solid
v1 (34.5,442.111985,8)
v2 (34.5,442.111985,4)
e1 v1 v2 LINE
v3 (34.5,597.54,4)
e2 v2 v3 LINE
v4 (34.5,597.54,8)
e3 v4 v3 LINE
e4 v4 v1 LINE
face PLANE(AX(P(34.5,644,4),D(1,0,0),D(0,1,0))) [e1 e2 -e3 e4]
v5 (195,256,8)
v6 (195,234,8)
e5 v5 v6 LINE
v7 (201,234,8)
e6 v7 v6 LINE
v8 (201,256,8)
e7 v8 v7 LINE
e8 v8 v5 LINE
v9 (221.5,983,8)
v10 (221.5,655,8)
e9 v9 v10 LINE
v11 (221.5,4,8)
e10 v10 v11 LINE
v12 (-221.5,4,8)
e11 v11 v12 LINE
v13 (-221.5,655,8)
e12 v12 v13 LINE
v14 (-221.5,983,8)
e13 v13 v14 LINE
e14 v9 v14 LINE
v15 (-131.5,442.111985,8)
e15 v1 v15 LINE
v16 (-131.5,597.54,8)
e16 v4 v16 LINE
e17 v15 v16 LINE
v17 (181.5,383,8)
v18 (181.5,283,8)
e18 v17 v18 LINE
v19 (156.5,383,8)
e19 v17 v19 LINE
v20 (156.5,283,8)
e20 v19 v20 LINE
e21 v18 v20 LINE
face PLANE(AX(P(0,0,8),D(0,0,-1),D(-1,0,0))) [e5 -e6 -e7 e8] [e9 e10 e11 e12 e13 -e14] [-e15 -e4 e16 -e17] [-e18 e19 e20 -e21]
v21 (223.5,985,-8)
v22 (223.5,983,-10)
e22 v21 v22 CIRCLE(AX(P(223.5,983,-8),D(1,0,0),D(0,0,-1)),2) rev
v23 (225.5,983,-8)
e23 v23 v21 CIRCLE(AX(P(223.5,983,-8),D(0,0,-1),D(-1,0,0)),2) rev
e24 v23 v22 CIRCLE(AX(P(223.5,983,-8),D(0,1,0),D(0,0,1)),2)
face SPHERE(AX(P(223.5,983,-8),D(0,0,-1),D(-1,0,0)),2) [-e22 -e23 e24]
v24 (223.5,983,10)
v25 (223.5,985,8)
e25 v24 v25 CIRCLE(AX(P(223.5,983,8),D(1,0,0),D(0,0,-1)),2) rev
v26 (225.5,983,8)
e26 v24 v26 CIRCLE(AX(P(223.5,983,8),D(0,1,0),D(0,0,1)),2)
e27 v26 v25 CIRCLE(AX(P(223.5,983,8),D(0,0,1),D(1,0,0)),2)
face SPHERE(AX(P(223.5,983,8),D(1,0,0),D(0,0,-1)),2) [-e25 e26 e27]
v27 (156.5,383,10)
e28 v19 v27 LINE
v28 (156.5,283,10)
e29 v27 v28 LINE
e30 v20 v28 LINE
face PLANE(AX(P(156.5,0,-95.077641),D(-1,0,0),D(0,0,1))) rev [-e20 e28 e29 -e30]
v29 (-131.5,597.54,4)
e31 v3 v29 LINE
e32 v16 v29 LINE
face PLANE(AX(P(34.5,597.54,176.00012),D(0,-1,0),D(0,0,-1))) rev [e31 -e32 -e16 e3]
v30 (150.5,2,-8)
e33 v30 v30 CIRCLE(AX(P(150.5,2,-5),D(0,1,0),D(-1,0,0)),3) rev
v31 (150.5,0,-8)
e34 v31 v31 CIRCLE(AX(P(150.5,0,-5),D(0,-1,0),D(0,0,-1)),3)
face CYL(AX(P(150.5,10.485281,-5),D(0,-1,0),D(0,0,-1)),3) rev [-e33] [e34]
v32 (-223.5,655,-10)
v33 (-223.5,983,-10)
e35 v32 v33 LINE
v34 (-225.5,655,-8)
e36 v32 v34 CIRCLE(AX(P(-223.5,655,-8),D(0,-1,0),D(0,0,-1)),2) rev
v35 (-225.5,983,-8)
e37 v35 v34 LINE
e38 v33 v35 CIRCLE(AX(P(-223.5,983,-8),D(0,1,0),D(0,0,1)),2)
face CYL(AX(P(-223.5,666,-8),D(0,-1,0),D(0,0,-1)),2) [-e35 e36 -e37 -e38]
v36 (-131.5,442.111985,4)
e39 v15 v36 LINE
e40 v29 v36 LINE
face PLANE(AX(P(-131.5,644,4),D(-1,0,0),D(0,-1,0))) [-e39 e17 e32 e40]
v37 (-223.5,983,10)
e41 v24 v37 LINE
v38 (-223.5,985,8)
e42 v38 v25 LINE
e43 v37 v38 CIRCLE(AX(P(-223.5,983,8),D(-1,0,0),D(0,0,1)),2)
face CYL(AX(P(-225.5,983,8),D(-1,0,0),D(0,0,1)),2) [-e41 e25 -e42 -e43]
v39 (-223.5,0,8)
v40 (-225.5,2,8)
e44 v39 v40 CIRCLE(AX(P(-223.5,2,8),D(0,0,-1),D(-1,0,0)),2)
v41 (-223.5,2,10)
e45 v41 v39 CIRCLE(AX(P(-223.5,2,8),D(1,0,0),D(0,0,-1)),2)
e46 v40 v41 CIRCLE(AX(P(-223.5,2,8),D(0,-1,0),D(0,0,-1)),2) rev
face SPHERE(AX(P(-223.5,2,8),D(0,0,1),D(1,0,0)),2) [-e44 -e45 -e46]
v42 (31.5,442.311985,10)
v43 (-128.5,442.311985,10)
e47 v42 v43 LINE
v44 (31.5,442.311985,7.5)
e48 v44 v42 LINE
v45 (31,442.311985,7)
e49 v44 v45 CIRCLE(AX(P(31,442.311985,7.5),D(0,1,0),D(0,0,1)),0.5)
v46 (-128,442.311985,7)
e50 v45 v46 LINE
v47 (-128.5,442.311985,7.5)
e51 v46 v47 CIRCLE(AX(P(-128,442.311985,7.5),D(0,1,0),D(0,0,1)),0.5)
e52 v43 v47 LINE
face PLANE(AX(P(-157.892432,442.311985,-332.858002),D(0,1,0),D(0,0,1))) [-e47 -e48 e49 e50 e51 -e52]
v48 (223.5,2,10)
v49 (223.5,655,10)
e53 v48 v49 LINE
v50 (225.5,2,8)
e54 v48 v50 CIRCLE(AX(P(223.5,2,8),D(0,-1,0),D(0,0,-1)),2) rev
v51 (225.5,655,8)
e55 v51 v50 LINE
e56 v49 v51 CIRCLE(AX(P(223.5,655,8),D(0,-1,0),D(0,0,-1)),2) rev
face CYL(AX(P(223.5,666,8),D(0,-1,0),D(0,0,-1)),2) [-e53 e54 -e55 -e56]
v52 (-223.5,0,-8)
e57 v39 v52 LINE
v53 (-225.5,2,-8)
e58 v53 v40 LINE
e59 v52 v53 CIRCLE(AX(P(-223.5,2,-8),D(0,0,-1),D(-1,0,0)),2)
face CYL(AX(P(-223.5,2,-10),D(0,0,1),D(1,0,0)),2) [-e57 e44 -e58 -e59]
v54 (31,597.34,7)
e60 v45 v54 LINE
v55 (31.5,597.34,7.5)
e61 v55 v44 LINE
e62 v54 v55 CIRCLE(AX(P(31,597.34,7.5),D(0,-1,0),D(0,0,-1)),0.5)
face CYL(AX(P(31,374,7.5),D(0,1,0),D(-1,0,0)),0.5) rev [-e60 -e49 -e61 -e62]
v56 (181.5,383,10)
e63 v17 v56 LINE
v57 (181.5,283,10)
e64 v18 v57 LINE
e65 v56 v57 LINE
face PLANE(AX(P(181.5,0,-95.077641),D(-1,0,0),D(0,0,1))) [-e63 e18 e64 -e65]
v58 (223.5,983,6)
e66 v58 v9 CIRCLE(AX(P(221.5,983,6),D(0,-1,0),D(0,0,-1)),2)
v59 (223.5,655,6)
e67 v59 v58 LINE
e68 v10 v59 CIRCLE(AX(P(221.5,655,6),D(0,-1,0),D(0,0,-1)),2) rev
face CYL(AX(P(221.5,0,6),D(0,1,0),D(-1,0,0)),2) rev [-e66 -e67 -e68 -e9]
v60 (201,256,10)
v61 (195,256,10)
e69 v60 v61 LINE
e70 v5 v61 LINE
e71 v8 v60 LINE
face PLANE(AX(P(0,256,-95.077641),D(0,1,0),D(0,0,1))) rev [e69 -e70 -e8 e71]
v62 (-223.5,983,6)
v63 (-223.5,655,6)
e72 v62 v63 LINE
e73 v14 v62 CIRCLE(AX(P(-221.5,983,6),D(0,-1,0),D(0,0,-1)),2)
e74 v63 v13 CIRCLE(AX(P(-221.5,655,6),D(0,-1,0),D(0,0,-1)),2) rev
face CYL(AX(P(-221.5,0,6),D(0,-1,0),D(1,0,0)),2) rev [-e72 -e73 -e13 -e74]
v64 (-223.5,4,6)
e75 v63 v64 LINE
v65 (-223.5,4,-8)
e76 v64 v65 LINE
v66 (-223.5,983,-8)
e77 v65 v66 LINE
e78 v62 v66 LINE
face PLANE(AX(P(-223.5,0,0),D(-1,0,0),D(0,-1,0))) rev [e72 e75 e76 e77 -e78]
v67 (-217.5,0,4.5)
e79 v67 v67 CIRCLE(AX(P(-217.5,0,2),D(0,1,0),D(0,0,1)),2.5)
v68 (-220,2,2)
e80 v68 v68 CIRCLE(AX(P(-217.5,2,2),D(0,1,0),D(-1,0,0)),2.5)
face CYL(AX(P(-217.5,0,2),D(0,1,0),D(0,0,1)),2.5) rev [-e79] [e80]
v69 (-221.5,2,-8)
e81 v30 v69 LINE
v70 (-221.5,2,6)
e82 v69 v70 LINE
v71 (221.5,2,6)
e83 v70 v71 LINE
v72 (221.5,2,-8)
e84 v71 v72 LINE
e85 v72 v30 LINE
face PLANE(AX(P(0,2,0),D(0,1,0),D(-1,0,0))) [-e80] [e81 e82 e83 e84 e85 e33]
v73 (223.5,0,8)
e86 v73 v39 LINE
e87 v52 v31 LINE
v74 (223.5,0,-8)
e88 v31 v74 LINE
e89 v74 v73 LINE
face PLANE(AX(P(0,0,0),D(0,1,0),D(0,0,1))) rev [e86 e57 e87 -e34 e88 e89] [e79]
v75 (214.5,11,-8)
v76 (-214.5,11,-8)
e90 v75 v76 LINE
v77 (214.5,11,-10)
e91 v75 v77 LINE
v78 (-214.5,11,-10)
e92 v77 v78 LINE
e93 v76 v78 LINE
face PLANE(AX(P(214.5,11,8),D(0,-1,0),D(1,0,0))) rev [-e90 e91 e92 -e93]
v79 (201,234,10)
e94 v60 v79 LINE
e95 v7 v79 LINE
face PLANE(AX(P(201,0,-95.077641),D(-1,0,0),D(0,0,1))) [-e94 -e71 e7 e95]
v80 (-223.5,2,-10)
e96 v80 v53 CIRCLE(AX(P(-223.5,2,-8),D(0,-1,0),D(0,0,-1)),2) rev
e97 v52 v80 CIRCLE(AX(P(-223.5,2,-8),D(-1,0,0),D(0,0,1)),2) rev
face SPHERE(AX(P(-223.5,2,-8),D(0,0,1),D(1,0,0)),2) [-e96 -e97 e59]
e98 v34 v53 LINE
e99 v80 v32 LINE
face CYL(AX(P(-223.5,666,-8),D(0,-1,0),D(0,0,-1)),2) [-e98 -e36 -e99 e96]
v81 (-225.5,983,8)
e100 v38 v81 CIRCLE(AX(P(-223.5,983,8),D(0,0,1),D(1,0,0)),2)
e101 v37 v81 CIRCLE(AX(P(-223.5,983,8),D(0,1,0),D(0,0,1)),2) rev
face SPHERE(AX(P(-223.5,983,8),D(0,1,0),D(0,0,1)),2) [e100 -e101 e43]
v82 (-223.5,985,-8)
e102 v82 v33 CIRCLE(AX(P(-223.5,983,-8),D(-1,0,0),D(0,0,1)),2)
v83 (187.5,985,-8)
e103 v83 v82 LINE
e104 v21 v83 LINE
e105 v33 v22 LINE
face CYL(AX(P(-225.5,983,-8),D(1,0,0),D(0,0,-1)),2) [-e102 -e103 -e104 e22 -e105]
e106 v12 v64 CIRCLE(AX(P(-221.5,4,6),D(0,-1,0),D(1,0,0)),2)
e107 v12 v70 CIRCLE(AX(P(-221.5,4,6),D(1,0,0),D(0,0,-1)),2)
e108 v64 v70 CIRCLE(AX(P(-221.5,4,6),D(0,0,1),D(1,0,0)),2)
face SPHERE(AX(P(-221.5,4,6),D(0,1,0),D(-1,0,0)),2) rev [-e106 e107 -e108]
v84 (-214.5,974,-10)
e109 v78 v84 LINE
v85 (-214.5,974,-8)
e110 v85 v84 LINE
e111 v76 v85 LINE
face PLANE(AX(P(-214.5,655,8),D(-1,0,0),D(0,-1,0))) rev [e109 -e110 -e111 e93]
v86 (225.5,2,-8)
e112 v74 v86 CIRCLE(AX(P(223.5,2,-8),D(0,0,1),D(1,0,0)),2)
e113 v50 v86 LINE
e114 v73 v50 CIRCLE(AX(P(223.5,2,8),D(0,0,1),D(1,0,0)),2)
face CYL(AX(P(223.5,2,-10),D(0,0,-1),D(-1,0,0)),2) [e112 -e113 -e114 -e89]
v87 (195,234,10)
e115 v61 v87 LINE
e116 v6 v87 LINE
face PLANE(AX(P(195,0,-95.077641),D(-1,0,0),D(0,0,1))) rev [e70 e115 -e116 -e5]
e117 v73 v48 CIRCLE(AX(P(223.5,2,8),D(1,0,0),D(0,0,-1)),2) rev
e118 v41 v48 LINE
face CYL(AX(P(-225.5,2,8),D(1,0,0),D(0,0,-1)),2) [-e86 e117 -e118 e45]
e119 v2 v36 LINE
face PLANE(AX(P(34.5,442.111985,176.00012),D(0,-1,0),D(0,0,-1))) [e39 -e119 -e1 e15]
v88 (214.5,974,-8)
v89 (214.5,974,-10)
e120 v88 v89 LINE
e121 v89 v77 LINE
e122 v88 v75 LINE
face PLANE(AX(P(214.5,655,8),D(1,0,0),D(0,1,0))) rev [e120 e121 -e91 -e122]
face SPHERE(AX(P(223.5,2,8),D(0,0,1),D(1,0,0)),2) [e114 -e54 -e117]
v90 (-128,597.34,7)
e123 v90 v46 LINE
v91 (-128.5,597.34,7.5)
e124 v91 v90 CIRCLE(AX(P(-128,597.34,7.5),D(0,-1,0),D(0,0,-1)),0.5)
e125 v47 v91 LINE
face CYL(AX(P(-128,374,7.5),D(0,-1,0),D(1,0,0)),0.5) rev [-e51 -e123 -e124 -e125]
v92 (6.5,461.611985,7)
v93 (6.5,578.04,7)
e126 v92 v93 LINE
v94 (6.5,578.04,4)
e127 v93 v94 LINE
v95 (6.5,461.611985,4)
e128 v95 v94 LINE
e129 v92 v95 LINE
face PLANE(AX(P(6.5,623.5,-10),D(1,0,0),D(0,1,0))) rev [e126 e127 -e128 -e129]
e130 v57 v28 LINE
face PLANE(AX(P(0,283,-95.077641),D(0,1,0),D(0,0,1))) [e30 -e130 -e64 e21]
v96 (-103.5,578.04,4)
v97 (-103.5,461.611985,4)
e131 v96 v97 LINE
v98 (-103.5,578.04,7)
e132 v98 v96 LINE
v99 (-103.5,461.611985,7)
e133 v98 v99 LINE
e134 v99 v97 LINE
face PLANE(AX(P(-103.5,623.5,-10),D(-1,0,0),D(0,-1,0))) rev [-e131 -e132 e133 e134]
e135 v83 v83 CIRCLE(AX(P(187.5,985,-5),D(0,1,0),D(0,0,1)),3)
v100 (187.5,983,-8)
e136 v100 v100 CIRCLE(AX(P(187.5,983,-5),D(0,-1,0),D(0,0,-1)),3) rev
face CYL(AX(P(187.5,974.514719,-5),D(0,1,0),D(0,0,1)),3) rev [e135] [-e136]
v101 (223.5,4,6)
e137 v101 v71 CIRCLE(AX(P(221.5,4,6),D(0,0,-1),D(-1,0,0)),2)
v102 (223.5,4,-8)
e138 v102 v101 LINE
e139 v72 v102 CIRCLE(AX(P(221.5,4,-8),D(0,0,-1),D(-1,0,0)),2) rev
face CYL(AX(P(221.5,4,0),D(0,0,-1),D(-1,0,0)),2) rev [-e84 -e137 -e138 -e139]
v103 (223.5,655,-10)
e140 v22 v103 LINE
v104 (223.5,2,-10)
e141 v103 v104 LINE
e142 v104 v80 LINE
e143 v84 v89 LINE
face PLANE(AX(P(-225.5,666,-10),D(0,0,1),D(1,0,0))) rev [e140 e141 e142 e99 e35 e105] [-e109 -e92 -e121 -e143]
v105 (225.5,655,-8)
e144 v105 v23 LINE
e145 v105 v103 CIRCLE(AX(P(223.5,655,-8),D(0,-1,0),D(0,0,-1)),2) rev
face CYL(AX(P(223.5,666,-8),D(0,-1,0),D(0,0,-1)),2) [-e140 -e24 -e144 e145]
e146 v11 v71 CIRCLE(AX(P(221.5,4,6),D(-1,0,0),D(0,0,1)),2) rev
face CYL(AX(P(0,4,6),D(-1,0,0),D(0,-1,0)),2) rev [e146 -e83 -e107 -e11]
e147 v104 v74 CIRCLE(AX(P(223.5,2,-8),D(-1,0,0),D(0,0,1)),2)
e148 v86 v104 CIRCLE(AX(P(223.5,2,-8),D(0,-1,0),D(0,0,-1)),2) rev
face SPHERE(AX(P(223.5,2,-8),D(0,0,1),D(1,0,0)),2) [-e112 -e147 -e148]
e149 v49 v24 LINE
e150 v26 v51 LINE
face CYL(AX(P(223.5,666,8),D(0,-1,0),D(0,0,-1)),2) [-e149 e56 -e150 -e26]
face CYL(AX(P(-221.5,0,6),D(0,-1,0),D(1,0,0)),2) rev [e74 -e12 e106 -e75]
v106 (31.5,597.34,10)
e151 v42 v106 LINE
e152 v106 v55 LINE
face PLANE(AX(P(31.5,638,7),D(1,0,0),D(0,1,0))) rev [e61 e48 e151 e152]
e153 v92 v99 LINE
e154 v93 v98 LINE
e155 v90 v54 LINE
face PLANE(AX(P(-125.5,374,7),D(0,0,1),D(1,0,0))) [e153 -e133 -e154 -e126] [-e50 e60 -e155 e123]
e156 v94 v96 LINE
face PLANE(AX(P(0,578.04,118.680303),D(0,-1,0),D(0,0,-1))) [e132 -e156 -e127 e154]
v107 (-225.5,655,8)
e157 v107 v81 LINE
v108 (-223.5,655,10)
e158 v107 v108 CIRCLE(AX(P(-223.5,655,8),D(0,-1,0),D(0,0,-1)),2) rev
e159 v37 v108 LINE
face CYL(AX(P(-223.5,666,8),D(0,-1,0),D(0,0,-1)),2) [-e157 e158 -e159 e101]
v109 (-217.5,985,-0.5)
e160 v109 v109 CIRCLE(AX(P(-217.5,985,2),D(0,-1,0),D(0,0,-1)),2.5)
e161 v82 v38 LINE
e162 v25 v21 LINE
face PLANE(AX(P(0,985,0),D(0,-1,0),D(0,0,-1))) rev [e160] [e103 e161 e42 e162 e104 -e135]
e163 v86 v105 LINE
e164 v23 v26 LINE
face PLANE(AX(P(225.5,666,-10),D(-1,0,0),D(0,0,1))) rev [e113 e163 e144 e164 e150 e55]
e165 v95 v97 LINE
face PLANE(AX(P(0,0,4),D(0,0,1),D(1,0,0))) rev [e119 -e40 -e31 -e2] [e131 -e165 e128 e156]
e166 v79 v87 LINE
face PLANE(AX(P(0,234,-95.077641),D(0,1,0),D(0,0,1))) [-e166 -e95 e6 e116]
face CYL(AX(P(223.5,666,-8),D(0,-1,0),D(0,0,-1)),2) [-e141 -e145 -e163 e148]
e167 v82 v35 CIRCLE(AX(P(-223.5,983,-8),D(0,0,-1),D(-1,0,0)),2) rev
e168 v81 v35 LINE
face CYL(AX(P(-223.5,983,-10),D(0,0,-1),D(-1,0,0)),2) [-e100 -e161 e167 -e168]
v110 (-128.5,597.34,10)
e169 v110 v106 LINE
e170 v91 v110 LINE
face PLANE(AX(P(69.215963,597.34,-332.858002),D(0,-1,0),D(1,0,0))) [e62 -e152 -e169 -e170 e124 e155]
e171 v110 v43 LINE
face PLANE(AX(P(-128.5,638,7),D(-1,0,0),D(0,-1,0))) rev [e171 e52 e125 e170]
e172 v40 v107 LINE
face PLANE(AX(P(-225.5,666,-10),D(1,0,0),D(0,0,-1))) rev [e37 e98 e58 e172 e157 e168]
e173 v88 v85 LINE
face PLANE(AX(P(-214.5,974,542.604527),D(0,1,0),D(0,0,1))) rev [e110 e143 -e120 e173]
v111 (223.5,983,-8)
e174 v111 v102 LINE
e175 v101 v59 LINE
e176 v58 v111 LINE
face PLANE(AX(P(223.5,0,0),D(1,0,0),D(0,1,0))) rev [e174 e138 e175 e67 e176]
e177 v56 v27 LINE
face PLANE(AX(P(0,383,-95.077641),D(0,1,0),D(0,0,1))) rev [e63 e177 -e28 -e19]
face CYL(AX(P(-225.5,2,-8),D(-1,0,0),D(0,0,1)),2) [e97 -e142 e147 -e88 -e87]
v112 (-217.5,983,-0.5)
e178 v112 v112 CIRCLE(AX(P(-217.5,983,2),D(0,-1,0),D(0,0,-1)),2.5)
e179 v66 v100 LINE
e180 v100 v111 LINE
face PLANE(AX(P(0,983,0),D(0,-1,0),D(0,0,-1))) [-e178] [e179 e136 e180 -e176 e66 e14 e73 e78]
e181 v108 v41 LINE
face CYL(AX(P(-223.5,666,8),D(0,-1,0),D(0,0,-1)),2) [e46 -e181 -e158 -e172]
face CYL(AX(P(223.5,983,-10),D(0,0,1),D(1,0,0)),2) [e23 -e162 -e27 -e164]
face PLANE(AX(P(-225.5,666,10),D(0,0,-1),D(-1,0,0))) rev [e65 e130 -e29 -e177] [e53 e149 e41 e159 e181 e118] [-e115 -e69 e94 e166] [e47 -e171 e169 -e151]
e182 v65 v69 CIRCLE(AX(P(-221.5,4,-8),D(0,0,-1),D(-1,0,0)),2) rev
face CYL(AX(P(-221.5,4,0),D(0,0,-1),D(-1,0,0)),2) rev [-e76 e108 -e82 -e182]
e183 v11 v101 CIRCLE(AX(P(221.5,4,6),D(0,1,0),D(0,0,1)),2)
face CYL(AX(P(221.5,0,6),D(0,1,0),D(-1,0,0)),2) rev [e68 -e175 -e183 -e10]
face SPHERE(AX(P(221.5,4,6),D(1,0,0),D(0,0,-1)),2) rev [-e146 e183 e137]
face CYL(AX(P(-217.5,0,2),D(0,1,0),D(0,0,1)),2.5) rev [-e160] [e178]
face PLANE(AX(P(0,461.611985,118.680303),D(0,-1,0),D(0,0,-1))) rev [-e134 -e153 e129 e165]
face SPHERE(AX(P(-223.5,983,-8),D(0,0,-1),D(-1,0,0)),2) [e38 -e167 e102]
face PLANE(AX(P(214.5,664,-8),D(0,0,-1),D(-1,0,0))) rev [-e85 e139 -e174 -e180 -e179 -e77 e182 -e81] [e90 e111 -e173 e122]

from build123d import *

# Parameters (mm, degrees)
SKETCH1_W                = 451
SKETCH1_H                = 20
BOSS_EXTRUDE1_DEPTH      = 666
SKETCH2_W                = 429
SKETCH2_H                = 644
CUT_EXTRUDE1_DEPTH       = 18
SKETCH3_W                = 429
SKETCH3_H                = 16
CUT_EXTRUDE2_DEPTH       = 9
SKETCH4_W                = 16
SKETCH4_H                = 653
CUT_EXTRUDE3_DEPTH       = 9
SKETCH5_W                = 438
SKETCH5_H                = 16
CUT_EXTRUDE4_DEPTH       = 9
SKETCH6_W                = 16
SKETCH6_H                = 662
CUT_EXTRUDE5_DEPTH       = 9
FILLET1_R                = 2
FILLET2_R                = 2
FILLET3_R                = 2
FILLET4_R                = 2
SKETCH16_R               = 3
CUT_EXTRUDE15_DEPTH      = 2
SKETCH23_W               = 451
SKETCH23_H               = 20
BOSS_EXTRUDE5_DEPTH      = 330
SKETCH25_W               = 429
SKETCH25_H               = 319
CUT_EXTRUDE19_DEPTH      = 18
SKETCH26_W               = 16
SKETCH26_H               = 319
CUT_EXTRUDE20_DEPTH      = 9
SKETCH27_W               = 438
SKETCH27_H               = 16
CUT_EXTRUDE21_DEPTH      = 9
SKETCH28_W               = 16
SKETCH28_H               = 328
CUT_EXTRUDE22_DEPTH      = 9
FILLET5_R                = 2
CUT_EXTRUDE24_DEPTH      = 1011.532161784
CUT_EXTRUDE24_DEPTH_BACK = 1011.532161784
SKETCH30_R               = 2.5
SKETCH31_R               = 3
CUT_EXTRUDE25_DEPTH      = 2
SKETCH29_R               = 3
CUT_EXTRUDE26_DEPTH      = 2
SKETCH32_W               = 25
SKETCH32_H               = 100
SKETCH32_W_2             = 6
SKETCH32_H_2             = 22
CUT_EXTRUDE27_DEPTH      = 2
SKETCH34_W               = 166
SKETCH34_H               = 276
BOSS_EXTRUDE6_DEPTH      = 6
CUT_EXTRUDE28_DEPTH      = 3
SKETCH35_R               = 4
CUT_EXTRUDE29_DEPTH      = 1011.625672542
SKETCH36_W               = 110
SKETCH36_H               = 232.68198512
CUT_EXTRUDE30_DEPTH      = 1011.625672542
SKETCH37_W               = 242.184541093
SKETCH37_H               = 239.855843582
SKETCH37_W_2             = 227.10839581
SKETCH37_H_2             = 174.911365708
BOSS_EXTRUDE7_DEPTH      = 2
SKETCH39_W               = 167.145869321
SKETCH39_H               = 47.919826933
SKETCH39_W_2             = 171.802191228
SKETCH39_H_2             = 78.040994734
CUT_EXTRUDE31_DEPTH      = 4
FILLET6_R                = 0.5
SKETCH40_W               = 166
SKETCH40_H               = 0.2
BOSS_EXTRUDE8_DEPTH      = 6
SKETCH41_W               = 110
SKETCH41_H               = 19.3
BOSS_EXTRUDE10_DEPTH     = 3


with BuildPart() as part:
    # Sketch1 → Boss-Extrude1 (new body)
    with BuildSketch(Plane(origin=(0, 0, 0), x_dir=(1, 0, 0), z_dir=(0, 1, 0))):
        Rectangle(SKETCH1_W, SKETCH1_H)
    extrude(amount=BOSS_EXTRUDE1_DEPTH)

    # Sketch2 → Cut-Extrude1 (cut)
    with BuildSketch(Plane(origin=(0, 0, -10), x_dir=(-1, 0, 0), z_dir=(0, 0, -1))):
        with Locations((0, 333)):
            Rectangle(SKETCH2_W, SKETCH2_H)
    extrude(amount=-CUT_EXTRUDE1_DEPTH, mode=Mode.SUBTRACT)

    # Sketch3 → Cut-Extrude2 (cut)
    with BuildSketch(Plane.XZ.offset(-655)):
        Rectangle(SKETCH3_W, SKETCH3_H)
    extrude(amount=-CUT_EXTRUDE2_DEPTH, mode=Mode.SUBTRACT)

    # Sketch4 → Cut-Extrude3 (cut)
    with BuildSketch(Plane.ZY.offset(-214.5)):
        with Locations((0, 337.5)):
            Rectangle(SKETCH4_W, SKETCH4_H)
    extrude(amount=-CUT_EXTRUDE3_DEPTH, mode=Mode.SUBTRACT)

    # Sketch5 → Cut-Extrude4 (cut)
    with BuildSketch(Plane(origin=(0, 11, 0), x_dir=(1, 0, 0), z_dir=(0, 1, 0))):
        with Locations((4.5, 0)):
            Rectangle(SKETCH5_W, SKETCH5_H)
    extrude(amount=-CUT_EXTRUDE4_DEPTH, mode=Mode.SUBTRACT)

    # Sketch6 → Cut-Extrude5 (cut)
    with BuildSketch(Plane(origin=(-214.5, 0, 0), x_dir=(0, 0, -1), z_dir=(1, 0, 0))):
        with Locations((0, 333)):
            Rectangle(SKETCH6_W, SKETCH6_H)
    extrude(amount=-CUT_EXTRUDE5_DEPTH, mode=Mode.SUBTRACT)

    # Fillet1
    fillet1_edges = [part.edges().sort_by_distance(p)[0] for p in [
        (0, 666, 10),
        (0, 664, 8),
        (0, 0, 10),
        (0, 0, -10),
        (-223.5, 333, 8),
        (225.5, 333, 10),
        (-225.5, 333, 10),
        (-225.5, 333, -10),
        (225.5, 333, -10),
        (0, 666, -10),
    ]]
    fillet(fillet1_edges, radius=FILLET1_R)

    # Fillet2
    fillet2_edges = [part.edges().sort_by_distance(p)[0] for p in [
        (223.5, 332, 8),
        (223.5, 2, 0),
        (223.5, 664, -1),
        (1, 2, 8),
        (223.5, 663.414213562, 7.414213562),
        (-223.5, 2, -1),
        (-222.914213562, 2, 7.414213562),
    ]]
    fillet(fillet2_edges, radius=FILLET2_R)

    # Fillet3
    # the kernel refuses this fillet: 2 mm, written as the material it takes off along each edge
    with BuildSketch(Plane(origin=(-223.5, 664, 8), x_dir=(0, 1, 0), z_dir=(-1, 0, 0))) as fillet3_piece_1_section:
        Polygon((0, 0), (FILLET3_R, 0), (FILLET3_R, -FILLET3_R), (0, -FILLET3_R), align=None)
    fillet3_piece_1 = extrude(amount=FILLET3_R, mode=Mode.PRIVATE)
    fillet3_piece_1 = fillet3_piece_1 - Plane(origin=(-223.5, 664, 8), x_dir=(0, -0.7071067811865475, -0.7071067811865475), z_dir=(-1, 0, 0)) * Sphere(FILLET3_R, mode=Mode.PRIVATE)
    add(fillet3_piece_1, mode=Mode.SUBTRACT)
    with BuildSketch(Plane(origin=(-223.5, 2, 8), x_dir=(-1, 0, 0), z_dir=(0, -1, 0))) as fillet3_piece_2_section:
        Polygon((0, 0), (FILLET3_R, 0), (FILLET3_R, -FILLET3_R), (0, -FILLET3_R), align=None)
    fillet3_piece_2 = extrude(amount=FILLET3_R, mode=Mode.PRIVATE)
    fillet3_piece_2 = fillet3_piece_2 - Plane(origin=(-223.5, 2, 8), x_dir=(0.7071067811865475, 0, -0.7071067811865475), z_dir=(0, -1, 0)) * Sphere(FILLET3_R, mode=Mode.PRIVATE)
    add(fillet3_piece_2, mode=Mode.SUBTRACT)
    with BuildSketch(Plane(origin=(223.5, 664, 8), x_dir=(0, 1, 0), z_dir=(1, 0, 0))) as fillet3_piece_3_section:
        Polygon((0, 0), (FILLET3_R, 0), (FILLET3_R, FILLET3_R), (0, FILLET3_R), align=None)
    fillet3_piece_3 = extrude(amount=FILLET3_R, mode=Mode.PRIVATE)
    fillet3_piece_3 = fillet3_piece_3 - Plane(origin=(223.5, 664, 8), x_dir=(0, -0.7071067811865475, -0.7071067811865475), z_dir=(1, 0, 0)) * Sphere(FILLET3_R, mode=Mode.PRIVATE)
    add(fillet3_piece_3, mode=Mode.SUBTRACT)
    with BuildSketch(Plane(origin=(223.5, 2, 8), x_dir=(1, 0, 0), z_dir=(0, -1, 0))) as fillet3_piece_4_section:
        Polygon((0, 0), (FILLET3_R, 0), (FILLET3_R, FILLET3_R), (0, FILLET3_R), align=None)
    fillet3_piece_4 = extrude(amount=FILLET3_R, mode=Mode.PRIVATE)
    fillet3_piece_4 = fillet3_piece_4 - Plane(origin=(223.5, 2, 8), x_dir=(-0.707106781186547, 0, -0.707106781186548), z_dir=(0, -1, 0)) * Sphere(FILLET3_R, mode=Mode.PRIVATE)
    add(fillet3_piece_4, mode=Mode.SUBTRACT)
    with BuildSketch(Plane(origin=(223.5, 2, -8), x_dir=(1, 0, 0), z_dir=(0, -1, 0))) as fillet3_piece_5_section:
        Polygon((0, 0), (FILLET3_R, 0), (FILLET3_R, -FILLET3_R), (0, -FILLET3_R), align=None)
    fillet3_piece_5 = extrude(amount=FILLET3_R, mode=Mode.PRIVATE)
    fillet3_piece_5 = fillet3_piece_5 - Plane(origin=(223.5, 2, -8), x_dir=(-0.707106781186548, 0, 0.707106781186547), z_dir=(0, -1, 0)) * Sphere(FILLET3_R, mode=Mode.PRIVATE)
    add(fillet3_piece_5, mode=Mode.SUBTRACT)
    with BuildSketch(Plane(origin=(-223.5, 2, -8), x_dir=(-1, 0, 0), z_dir=(0, -1, 0))) as fillet3_piece_6_section:
        Polygon((0, 0), (FILLET3_R, 0), (FILLET3_R, FILLET3_R), (0, FILLET3_R), align=None)
    fillet3_piece_6 = extrude(amount=FILLET3_R, mode=Mode.PRIVATE)
    fillet3_piece_6 = fillet3_piece_6 - Plane(origin=(-223.5, 2, -8), x_dir=(0.7071067811865475, 0, 0.7071067811865475), z_dir=(0, -1, 0)) * Sphere(FILLET3_R, mode=Mode.PRIVATE)
    add(fillet3_piece_6, mode=Mode.SUBTRACT)
    with BuildSketch(Plane(origin=(223.5, 664, -8), x_dir=(0, 1, 0), z_dir=(1, 0, 0))) as fillet3_piece_7_section:
        Polygon((0, 0), (FILLET3_R, 0), (FILLET3_R, -FILLET3_R), (0, -FILLET3_R), align=None)
    fillet3_piece_7 = extrude(amount=FILLET3_R, mode=Mode.PRIVATE)
    fillet3_piece_7 = fillet3_piece_7 - Plane(origin=(223.5, 664, -8), x_dir=(0, -0.7071067811865475, 0.7071067811865475), z_dir=(1, 0, 0)) * Sphere(FILLET3_R, mode=Mode.PRIVATE)
    add(fillet3_piece_7, mode=Mode.SUBTRACT)
    with BuildSketch(Plane(origin=(-223.5, 664, -8), x_dir=(0, 1, 0), z_dir=(-1, 0, 0))) as fillet3_piece_8_section:
        Polygon((0, 0), (FILLET3_R, 0), (FILLET3_R, FILLET3_R), (0, FILLET3_R), align=None)
    fillet3_piece_8 = extrude(amount=FILLET3_R, mode=Mode.PRIVATE)
    fillet3_piece_8 = fillet3_piece_8 - Plane(origin=(-223.5, 664, -8), x_dir=(0, -0.7071067811865475, 0.7071067811865475), z_dir=(-1, 0, 0)) * Sphere(FILLET3_R, mode=Mode.PRIVATE)
    add(fillet3_piece_8, mode=Mode.SUBTRACT)
    with BuildSketch(Plane(origin=(-225.5, 0, 8), x_dir=(1, 0, 0), z_dir=(0, 0, -1)), Plane(origin=(225.5, 0, -8), x_dir=(-1, 0, 0), z_dir=(0, 0, 1)), Plane(origin=(225.5, 666, -8), x_dir=(0, -1, 0), z_dir=(0, 0, 1)), Plane(origin=(-225.5, 666, 8), x_dir=(0, -1, 0), z_dir=(0, 0, -1))) as fillet3_piece_9:
        with BuildLine():
            CenterArc((FILLET3_R, -FILLET3_R), FILLET3_R, 90, 90)
            Line((0, -FILLET3_R), (0, 0))
            Line((0, 0), (FILLET3_R, 0))
        make_face()
    extrude(amount=16, mode=Mode.SUBTRACT)

    # Fillet4
    # the kernel refuses this fillet: 2 mm, written as the material it adds along each edge
    with BuildSketch(Plane(origin=(-221.5, 662, 6), x_dir=(-1, 0, 0), z_dir=(0, 1, 0))) as fillet4_piece_1_section:
        Polygon((0, 0), (FILLET4_R, 0), (FILLET4_R, FILLET4_R), (0, FILLET4_R), align=None)
    fillet4_piece_1 = extrude(amount=FILLET4_R, mode=Mode.PRIVATE)
    fillet4_piece_1 = fillet4_piece_1 - Plane(origin=(-221.5, 662, 6), x_dir=(0.7071067811865475, 0, -0.7071067811865475), z_dir=(0, 1, 0)) * Sphere(FILLET4_R, mode=Mode.PRIVATE)
    add(fillet4_piece_1)
    with BuildSketch(Plane(origin=(-223.5, 664, -8), x_dir=(1, 0, 0), z_dir=(0, 0, 1))) as fillet4_piece_2:
        with BuildLine():
            CenterArc((FILLET4_R, -FILLET4_R), FILLET4_R, 90, 90)
            Line((0, -FILLET4_R), (0, 0))
            Line((0, 0), (FILLET4_R, 0))
        make_face()
    extrude(amount=14)

    # Sketch16 → Cut-Extrude15 (cut)
    with BuildSketch(Plane(origin=(0, 666, 0), x_dir=(1, 0, 0), z_dir=(0, 1, 0))):
        with Locations(Location((-187.5, 5, 0), (0, 0, 90))):
            Circle(SKETCH16_R)
    extrude(amount=-CUT_EXTRUDE15_DEPTH, mode=Mode.SUBTRACT)

    # Sketch23 → Boss-Extrude5 (add)
    with BuildSketch(Plane.XZ.offset(-655)):
        Rectangle(SKETCH23_W, SKETCH23_H)
    extrude(amount=-BOSS_EXTRUDE5_DEPTH)

    # Sketch25 → Cut-Extrude19 (cut)
    with BuildSketch(Plane(origin=(0, 0, -10), x_dir=(-1, 0, 0), z_dir=(0, 0, -1))):
        with Locations((0, 814.5)):
            Rectangle(SKETCH25_W, SKETCH25_H)
    extrude(amount=-CUT_EXTRUDE19_DEPTH, mode=Mode.SUBTRACT)

    # Sketch26 → Cut-Extrude20 (cut)
    with BuildSketch(Plane(origin=(-214.5, 0, 0), x_dir=(0, 0, -1), z_dir=(1, 0, 0))):
        with Locations((0, 814.5)):
            Rectangle(SKETCH26_W, SKETCH26_H)
    extrude(amount=-CUT_EXTRUDE20_DEPTH, mode=Mode.SUBTRACT)

    # Sketch27 → Cut-Extrude21 (cut)
    with BuildSketch(Plane.XZ.offset(-974)):
        with Locations((-4.5, 0)):
            Rectangle(SKETCH27_W, SKETCH27_H)
    extrude(amount=-CUT_EXTRUDE21_DEPTH, mode=Mode.SUBTRACT)

    # Sketch28 → Cut-Extrude22 (cut)
    with BuildSketch(Plane.ZY.offset(-214.5)):
        with Locations((0, 819)):
            Rectangle(SKETCH28_W, SKETCH28_H)
    extrude(amount=-CUT_EXTRUDE22_DEPTH, mode=Mode.SUBTRACT)

    # Fillet5
    fillet5_edges = [part.edges().sort_by_distance(p)[0] for p in [
        (223.5, 819, 8),
        (-223.5, 819, 8),
        (-225.5, 820, 10),
        (-225.5, 820, -10),
        (-225.5, 985, 0),
        (0, 985, -10),
        (225.5, 985, 0),
        (0, 985, 10),
        (225.5, 820, 10),
        (225.5, 820, -10),
    ]]
    fillet(fillet5_edges, radius=FILLET5_R)

    # Sketch30 → Cut-Extrude24 (cut, two sides: drawn at the far end of the back side and taken through both)
    with BuildSketch(Plane(origin=(0, 985, 0), x_dir=(1, 0, 0), z_dir=(0, 1, 0)).offset(-CUT_EXTRUDE24_DEPTH_BACK)):
        with Locations(Location((-217.5, -2, 0), (0, 0, 90))):
            Circle(SKETCH30_R)
    extrude(amount=CUT_EXTRUDE24_DEPTH + CUT_EXTRUDE24_DEPTH_BACK, mode=Mode.SUBTRACT)

    # Sketch31 → Cut-Extrude25 (cut)
    with BuildSketch(Plane(origin=(0, 985, 0), x_dir=(1, 0, 0), z_dir=(0, 1, 0))):
        with Locations(Location((187.5, 5, 0), (0, 0, 90))):
            Circle(SKETCH31_R)
    extrude(amount=-CUT_EXTRUDE25_DEPTH, mode=Mode.SUBTRACT)

    # Sketch29 → Cut-Extrude26 (cut)
    with BuildSketch(Plane.XZ):
        with Locations(Location((150.5, -5, 0), (0, 0, 270))):
            Circle(SKETCH29_R)
    extrude(amount=-CUT_EXTRUDE26_DEPTH, mode=Mode.SUBTRACT)

    # Sketch32 → Cut-Extrude27 (cut)
    with BuildSketch(Plane.XY.offset(10)):
        with Locations((169, 333)):
            Rectangle(SKETCH32_W, SKETCH32_H)
        with Locations((198, 245)):
            Rectangle(SKETCH32_W_2, SKETCH32_H_2)
    extrude(amount=-CUT_EXTRUDE27_DEPTH, mode=Mode.SUBTRACT)

    # Sketch34 → Boss-Extrude6 (add)
    with BuildSketch(Plane.XY.offset(10)):
        with Locations((-48.5, 506)):
            Rectangle(SKETCH34_W, SKETCH34_H)
    extrude(amount=-BOSS_EXTRUDE6_DEPTH)

    # Sketch33 → Cut-Extrude28 (cut)
    with BuildSketch(Plane.XY.offset(10)):
        with BuildLine():
            Line((-125.5, 641), (28.5, 641))
            ThreePointArc((28.5, 641), (30.621320344, 640.121320344), (31.5, 638))
            Line((31.5, 638), (31.5, 374))
            ThreePointArc((31.5, 374), (30.621320344, 371.878679656), (28.5, 371))
            Line((28.5, 371), (-125.5, 371))
            ThreePointArc((-125.5, 371), (-127.621320344, 371.878679656), (-128.5, 374))
            Line((-128.5, 374), (-128.5, 638))
            ThreePointArc((-128.5, 638), (-127.621320344, 640.121320344), (-125.5, 641))
        make_face()
    extrude(amount=-CUT_EXTRUDE28_DEPTH, mode=Mode.SUBTRACT)

    # Sketch35 → Cut-Extrude29 (cut, through all)
    with BuildSketch(Plane.XY.offset(7)):
        with Locations((19.5, 629)):
            Circle(SKETCH35_R)
        with Locations((-116.5, 383)):
            Circle(SKETCH35_R)
        with Locations((-116.5, 629)):
            Circle(SKETCH35_R)
        with Locations((19.5, 383)):
            Circle(SKETCH35_R)
    extrude(amount=-CUT_EXTRUDE29_DEPTH, mode=Mode.SUBTRACT)

    # Sketch36 → Cut-Extrude30 (cut, through all)
    with BuildSketch(Plane.XY.offset(7)):
        with Locations((-48.5, 507.15900744)):
            Rectangle(SKETCH36_W, SKETCH36_H)
    extrude(amount=-CUT_EXTRUDE30_DEPTH, mode=Mode.SUBTRACT)

    # Sketch37 → Boss-Extrude7 (add)
    with BuildSketch(Plane.XY.offset(10)):
        with Locations((-51.876307083, 717.267921791)):
            Rectangle(SKETCH37_W, SKETCH37_H)
        with Locations((-44.338234442, 354.856302266)):
            Rectangle(SKETCH37_W_2, SKETCH37_H_2)
    extrude(amount=-BOSS_EXTRUDE7_DEPTH)

    # Sketch39 → Cut-Extrude31 (cut)
    with BuildSketch(Plane(origin=(0, 0, 4), x_dir=(-1, 0, 0), z_dir=(0, 0, -1))):
        with Locations((49.072934661, 621.299913467)):
            Rectangle(SKETCH39_W, SKETCH39_H)
        with Locations((47.429752922, 403.291487753)):
            Rectangle(SKETCH39_W_2, SKETCH39_H_2)
    extrude(amount=-CUT_EXTRUDE31_DEPTH, mode=Mode.SUBTRACT)

    # Fillet6
    fillet6_edges = [part.edges().sort_by_distance(p)[0] for p in [
        (31.5, 519.82599256, 7),
        (-128.5, 519.82599256, 7),
    ]]
    fillet(fillet6_edges, radius=FILLET6_R)

    # Sketch40 → Boss-Extrude8 (add)
    with BuildSketch(Plane(origin=(0, 0, 4), x_dir=(-1, 0, 0), z_dir=(0, 0, -1))):
        with Locations((48.5, 597.44)):
            Rectangle(SKETCH40_W, SKETCH40_H)
        with Locations((48.5, 442.21198512)):
            Rectangle(SKETCH40_W, SKETCH40_H)
    extrude(amount=-BOSS_EXTRUDE8_DEPTH)

    # Sketch41 → Boss-Extrude10 (add)
    with BuildSketch(Plane(origin=(0, 0, 4), x_dir=(-1, 0, 0), z_dir=(0, 0, -1))):
        with Locations((48.5, 587.69)):
            Rectangle(SKETCH41_W, SKETCH41_H)
        with Locations((48.5, 451.96198512)):
            Rectangle(SKETCH41_W, SKETCH41_H)
    extrude(amount=-BOSS_EXTRUDE10_DEPTH)


solid = part.part
